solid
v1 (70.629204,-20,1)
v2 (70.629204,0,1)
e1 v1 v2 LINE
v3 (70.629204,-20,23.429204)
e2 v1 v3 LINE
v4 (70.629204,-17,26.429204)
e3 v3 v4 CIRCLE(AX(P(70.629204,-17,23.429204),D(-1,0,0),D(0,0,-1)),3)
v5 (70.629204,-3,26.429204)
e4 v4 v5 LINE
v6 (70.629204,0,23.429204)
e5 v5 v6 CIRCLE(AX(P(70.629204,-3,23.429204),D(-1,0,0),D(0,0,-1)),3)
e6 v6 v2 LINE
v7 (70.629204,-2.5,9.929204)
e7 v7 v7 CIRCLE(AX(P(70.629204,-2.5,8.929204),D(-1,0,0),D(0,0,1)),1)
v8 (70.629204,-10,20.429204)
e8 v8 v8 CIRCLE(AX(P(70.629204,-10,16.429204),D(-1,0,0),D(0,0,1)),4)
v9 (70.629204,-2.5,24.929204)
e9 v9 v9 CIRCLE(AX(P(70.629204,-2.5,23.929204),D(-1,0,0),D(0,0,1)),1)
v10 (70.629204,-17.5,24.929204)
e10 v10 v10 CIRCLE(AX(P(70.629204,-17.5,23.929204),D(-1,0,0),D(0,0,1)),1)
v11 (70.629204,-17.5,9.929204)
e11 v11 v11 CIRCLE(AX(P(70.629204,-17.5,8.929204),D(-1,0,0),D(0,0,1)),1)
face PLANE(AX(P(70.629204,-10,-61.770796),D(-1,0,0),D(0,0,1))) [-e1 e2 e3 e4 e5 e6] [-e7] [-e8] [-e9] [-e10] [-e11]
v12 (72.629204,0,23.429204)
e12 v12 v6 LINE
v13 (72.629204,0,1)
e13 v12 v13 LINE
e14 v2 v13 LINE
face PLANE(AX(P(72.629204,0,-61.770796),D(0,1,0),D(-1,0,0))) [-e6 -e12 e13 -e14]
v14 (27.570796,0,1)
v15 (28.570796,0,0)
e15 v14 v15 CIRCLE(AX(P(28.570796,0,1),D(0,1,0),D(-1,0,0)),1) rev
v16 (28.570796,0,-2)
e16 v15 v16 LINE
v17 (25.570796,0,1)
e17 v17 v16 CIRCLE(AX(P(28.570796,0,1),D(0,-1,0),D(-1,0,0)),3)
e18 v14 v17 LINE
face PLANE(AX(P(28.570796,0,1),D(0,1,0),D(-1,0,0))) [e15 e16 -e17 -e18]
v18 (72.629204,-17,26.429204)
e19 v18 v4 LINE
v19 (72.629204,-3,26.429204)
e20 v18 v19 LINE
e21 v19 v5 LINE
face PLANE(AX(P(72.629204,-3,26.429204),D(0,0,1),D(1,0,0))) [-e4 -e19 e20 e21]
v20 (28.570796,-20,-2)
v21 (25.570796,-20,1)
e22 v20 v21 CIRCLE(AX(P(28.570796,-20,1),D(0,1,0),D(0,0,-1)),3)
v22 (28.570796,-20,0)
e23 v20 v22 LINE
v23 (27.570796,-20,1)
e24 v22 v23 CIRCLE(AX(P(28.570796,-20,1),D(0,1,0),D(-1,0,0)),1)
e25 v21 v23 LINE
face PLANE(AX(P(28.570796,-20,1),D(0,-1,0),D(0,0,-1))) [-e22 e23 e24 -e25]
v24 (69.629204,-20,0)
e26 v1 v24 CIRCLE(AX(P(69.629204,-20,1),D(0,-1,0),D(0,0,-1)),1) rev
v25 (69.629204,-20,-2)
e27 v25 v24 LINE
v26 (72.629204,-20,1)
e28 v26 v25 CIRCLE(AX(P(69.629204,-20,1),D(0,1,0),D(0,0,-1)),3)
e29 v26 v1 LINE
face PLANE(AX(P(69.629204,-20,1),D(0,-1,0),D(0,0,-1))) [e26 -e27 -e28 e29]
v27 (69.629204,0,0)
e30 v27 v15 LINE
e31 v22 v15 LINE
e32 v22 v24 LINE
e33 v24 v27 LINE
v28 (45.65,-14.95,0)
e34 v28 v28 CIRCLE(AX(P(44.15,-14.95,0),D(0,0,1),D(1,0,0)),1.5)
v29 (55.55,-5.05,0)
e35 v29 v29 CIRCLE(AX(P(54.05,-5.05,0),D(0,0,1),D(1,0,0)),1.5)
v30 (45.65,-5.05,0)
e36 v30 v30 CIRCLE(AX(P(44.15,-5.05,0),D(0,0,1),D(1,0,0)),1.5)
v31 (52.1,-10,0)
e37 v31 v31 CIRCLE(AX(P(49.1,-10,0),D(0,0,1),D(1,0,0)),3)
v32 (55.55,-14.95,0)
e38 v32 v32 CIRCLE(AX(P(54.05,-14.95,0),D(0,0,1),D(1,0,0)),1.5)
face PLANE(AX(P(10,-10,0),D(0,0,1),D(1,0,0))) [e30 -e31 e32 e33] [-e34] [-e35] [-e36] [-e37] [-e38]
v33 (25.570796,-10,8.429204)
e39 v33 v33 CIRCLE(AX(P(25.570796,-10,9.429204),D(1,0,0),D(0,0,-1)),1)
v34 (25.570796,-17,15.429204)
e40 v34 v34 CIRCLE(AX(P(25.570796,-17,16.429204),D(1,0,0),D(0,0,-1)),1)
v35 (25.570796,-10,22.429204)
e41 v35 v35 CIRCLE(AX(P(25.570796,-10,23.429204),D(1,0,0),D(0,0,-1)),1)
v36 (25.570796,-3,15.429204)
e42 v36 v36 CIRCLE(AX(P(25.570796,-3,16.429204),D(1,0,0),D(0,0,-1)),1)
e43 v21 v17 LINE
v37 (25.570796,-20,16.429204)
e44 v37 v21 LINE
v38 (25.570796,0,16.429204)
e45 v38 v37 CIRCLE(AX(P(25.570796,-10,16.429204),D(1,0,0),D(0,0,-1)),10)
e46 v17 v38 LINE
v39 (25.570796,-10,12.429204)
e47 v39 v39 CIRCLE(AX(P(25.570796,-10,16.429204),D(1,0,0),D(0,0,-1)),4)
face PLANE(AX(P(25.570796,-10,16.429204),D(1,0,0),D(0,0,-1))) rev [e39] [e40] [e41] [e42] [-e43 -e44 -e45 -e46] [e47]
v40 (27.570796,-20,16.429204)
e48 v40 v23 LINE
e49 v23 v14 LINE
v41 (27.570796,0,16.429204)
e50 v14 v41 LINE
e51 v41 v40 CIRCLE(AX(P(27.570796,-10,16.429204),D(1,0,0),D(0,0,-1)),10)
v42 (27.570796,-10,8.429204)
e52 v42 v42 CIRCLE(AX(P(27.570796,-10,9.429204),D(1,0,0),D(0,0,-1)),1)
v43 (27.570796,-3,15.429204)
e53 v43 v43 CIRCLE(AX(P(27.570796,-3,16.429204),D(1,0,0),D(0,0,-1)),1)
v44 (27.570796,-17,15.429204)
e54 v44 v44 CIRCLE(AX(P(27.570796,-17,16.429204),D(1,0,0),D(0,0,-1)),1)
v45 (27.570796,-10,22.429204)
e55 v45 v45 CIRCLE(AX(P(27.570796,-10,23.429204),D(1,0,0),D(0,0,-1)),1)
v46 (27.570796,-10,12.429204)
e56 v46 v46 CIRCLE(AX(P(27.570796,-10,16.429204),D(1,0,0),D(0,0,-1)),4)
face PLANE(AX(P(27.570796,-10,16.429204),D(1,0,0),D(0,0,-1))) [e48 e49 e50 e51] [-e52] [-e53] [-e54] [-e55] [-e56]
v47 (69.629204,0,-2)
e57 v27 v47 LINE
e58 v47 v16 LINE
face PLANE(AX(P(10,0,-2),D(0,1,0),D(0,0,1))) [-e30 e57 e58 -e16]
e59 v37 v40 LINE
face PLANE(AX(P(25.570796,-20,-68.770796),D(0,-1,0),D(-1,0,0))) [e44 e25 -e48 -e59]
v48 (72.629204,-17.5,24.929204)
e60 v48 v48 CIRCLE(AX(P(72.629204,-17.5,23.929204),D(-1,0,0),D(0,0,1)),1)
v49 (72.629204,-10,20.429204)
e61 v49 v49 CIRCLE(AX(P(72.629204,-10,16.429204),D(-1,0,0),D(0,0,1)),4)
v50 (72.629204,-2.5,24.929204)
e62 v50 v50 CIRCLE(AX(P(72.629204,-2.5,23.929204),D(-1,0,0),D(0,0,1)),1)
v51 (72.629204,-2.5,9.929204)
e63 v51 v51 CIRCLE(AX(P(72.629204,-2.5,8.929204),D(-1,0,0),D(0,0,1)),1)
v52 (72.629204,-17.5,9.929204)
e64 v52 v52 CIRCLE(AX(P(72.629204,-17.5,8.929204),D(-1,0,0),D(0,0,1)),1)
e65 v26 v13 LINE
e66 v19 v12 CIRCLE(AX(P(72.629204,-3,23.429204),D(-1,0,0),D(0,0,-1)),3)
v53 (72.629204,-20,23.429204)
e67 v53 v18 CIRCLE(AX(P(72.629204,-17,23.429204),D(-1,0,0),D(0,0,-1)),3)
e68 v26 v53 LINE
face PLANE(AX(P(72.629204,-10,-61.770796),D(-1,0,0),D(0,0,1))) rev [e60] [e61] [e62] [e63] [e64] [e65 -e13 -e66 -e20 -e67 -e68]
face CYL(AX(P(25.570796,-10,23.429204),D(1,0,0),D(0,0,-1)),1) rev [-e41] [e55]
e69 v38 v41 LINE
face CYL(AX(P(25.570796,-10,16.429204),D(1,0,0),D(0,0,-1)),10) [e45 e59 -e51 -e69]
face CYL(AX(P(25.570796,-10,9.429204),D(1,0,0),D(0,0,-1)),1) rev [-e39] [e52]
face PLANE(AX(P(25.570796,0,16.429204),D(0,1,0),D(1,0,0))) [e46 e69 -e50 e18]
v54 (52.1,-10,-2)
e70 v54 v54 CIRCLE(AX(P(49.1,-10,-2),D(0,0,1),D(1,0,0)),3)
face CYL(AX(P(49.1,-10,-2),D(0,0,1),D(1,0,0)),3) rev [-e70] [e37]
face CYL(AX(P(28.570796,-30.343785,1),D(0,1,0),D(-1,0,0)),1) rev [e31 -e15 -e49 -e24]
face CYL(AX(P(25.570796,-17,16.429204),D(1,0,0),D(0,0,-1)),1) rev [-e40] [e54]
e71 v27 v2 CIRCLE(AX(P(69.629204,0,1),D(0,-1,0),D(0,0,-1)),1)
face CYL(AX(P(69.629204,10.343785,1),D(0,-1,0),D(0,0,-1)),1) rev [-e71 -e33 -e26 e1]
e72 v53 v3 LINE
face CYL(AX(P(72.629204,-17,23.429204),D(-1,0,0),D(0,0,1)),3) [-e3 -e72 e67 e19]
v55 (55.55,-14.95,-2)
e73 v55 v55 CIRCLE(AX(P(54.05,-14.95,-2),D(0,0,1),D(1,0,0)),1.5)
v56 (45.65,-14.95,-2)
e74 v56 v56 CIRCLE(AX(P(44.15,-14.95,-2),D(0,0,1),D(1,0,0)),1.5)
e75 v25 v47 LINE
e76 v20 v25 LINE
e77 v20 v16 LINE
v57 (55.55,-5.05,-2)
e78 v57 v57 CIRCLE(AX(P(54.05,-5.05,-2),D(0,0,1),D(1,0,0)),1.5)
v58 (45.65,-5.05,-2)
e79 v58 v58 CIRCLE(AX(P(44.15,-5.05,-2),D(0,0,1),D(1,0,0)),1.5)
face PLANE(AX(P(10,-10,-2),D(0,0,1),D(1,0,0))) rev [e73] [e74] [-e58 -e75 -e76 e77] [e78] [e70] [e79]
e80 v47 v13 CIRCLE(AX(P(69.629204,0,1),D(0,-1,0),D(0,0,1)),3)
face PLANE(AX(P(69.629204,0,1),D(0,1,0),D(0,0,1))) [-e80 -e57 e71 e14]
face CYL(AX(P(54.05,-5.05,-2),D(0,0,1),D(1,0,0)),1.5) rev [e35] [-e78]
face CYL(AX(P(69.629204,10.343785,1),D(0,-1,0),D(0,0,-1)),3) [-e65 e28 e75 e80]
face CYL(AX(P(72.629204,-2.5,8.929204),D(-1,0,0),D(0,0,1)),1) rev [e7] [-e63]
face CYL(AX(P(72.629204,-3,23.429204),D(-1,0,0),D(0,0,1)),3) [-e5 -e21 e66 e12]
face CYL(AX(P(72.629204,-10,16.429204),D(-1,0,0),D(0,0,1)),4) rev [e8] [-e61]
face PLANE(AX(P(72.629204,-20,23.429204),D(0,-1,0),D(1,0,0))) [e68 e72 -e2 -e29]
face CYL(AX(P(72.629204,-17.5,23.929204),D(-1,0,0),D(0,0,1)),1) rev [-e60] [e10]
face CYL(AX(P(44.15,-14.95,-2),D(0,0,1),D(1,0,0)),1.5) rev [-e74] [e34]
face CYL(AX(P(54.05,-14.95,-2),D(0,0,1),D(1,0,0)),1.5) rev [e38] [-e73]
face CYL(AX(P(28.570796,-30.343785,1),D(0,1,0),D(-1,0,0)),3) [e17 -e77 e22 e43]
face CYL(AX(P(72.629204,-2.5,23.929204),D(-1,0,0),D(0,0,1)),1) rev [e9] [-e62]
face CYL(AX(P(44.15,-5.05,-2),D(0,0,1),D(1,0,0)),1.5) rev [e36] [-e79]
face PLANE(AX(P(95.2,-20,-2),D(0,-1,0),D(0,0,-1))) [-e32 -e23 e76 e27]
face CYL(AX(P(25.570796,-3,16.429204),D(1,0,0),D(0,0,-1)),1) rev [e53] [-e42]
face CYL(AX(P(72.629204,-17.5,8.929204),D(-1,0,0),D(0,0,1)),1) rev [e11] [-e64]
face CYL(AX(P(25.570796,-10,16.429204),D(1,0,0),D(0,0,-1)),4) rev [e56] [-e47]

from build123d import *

# Parameters (mm, degrees)
IZIM1_R                      = 4
IZIM1_R_2                    = 1
IZIM1_R_3                    = 3
IZIM1_R_4                    = 1.5
TABAN_FLAN_2_DEPTH           = 2
IZGIDEN_START                = -1
IZGIDEN_B_KME2_OUTLINE_W     = 20
IZGIDEN_B_KME2_OUTLINE_H     = 2
IZGIDEN_B_KME2_DEPTH         = 26.570796327
IZGIDEN_START_2              = 72.629203673
IZGIDEN_B_KME2_2_OUTLINE_W   = 20
IZGIDEN_B_KME2_2_OUTLINE_H   = 2
IZGIDEN_B_KME2_2_DEPTH       = 25.570796327
IZGIDEN_START_3              = 25.570796327
IZGIDEN_B_KME2_3_OUTLINE_R   = 1
IZGIDEN_B_KME2_3_OUTLINE_R_2 = 4
IZGIDEN_B_KME2_3_DEPTH       = 3
IZGIDEN_START_4              = 69.629203673
IZGIDEN_B_KME2_4_OUTLINE_R   = 1
IZGIDEN_B_KME2_4_OUTLINE_R_2 = 4
IZGIDEN_B_KME2_4_DEPTH       = 3
IZGIDEN_START_5              = 70.629203673
IZGIDEN_B_KME2_5_OUTLINE_R   = 1
IZGIDEN_B_KME2_5_DEPTH       = 2
IZGIDEN_B_KME2_6_OUTLINE_R   = 1
IZGIDEN_B_KME2_6_DEPTH       = 2
IZGIDEN_START_6              = -21
IZGIDEN_B_KME2_7_DEPTH       = 22


with BuildPart() as part:
    # Taban-Flanş2: sheet metal written as solids
    # Çizim1 → Taban-Flanş2 (new body)
    with BuildSketch(Plane.XY):
        with BuildLine():
            Line((98.2, -3), (98.2, -17))
            ThreePointArc((98.2, -17), (97.321320344, -19.121320344), (95.2, -20))
            Line((95.2, -20), (10, -20))
            ThreePointArc((10, -20), (0, -10), (10, 0))
            Line((10, 0), (95.2, 0))
            ThreePointArc((95.2, 0), (97.321320344, -0.878679656), (98.2, -3))
        make_face()
        with Locations((10, -10)):
            Circle(IZIM1_R, mode=Mode.SUBTRACT)
        with Locations((10, -17)):
            Circle(IZIM1_R_2, mode=Mode.SUBTRACT)
        with Locations((3, -10)):
            Circle(IZIM1_R_2, mode=Mode.SUBTRACT)
        with Locations((10, -3)):
            Circle(IZIM1_R_2, mode=Mode.SUBTRACT)
        with Locations((17, -10)):
            Circle(IZIM1_R_2, mode=Mode.SUBTRACT)
        with Locations((88.2, -10)):
            Circle(IZIM1_R, mode=Mode.SUBTRACT)
        with Locations((80.7, -2.5)):
            Circle(IZIM1_R_2, mode=Mode.SUBTRACT)
        with Locations((95.7, -2.5)):
            Circle(IZIM1_R_2, mode=Mode.SUBTRACT)
        with Locations((95.7, -17.5)):
            Circle(IZIM1_R_2, mode=Mode.SUBTRACT)
        with Locations((80.7, -17.5)):
            Circle(IZIM1_R_2, mode=Mode.SUBTRACT)
        with Locations((49.1, -10)):
            Circle(IZIM1_R_3, mode=Mode.SUBTRACT)
        with Locations((54.05, -5.05)):
            Circle(IZIM1_R_4, mode=Mode.SUBTRACT)
        with Locations((44.15, -5.05)):
            Circle(IZIM1_R_4, mode=Mode.SUBTRACT)
        with Locations((44.15, -14.95)):
            Circle(IZIM1_R_4, mode=Mode.SUBTRACT)
        with Locations((54.05, -14.95)):
            Circle(IZIM1_R_4, mode=Mode.SUBTRACT)
    extrude(amount=-TABAN_FLAN_2_DEPTH)

    # Çizgiden Bükme2: read off the stored shape, not the designer's step
    # Çizgiden Bükme2 outline → Çizgiden Bükme2 (cut)
    with BuildSketch(Plane.YZ.offset(IZGIDEN_START)):
        with Locations((-10, -1)):
            Rectangle(IZGIDEN_B_KME2_OUTLINE_W, IZGIDEN_B_KME2_OUTLINE_H)
    extrude(amount=IZGIDEN_B_KME2_DEPTH, mode=Mode.SUBTRACT)

    # izgiden B_kme2 2 outline → izgiden B_kme2 2 (cut)
    with BuildSketch(Plane.YZ.offset(IZGIDEN_START_2)):
        with Locations((-10, -1)):
            Rectangle(IZGIDEN_B_KME2_2_OUTLINE_W, IZGIDEN_B_KME2_2_OUTLINE_H)
    extrude(amount=IZGIDEN_B_KME2_2_DEPTH, mode=Mode.SUBTRACT)

    # izgiden B_kme2 3 outline → izgiden B_kme2 3 (add)
    with BuildSketch(Plane.YZ.offset(IZGIDEN_START_3)):
        with BuildLine():
            Line((-20, 0), (0, 0))
            Line((0, 0), (0, 16.429203673))
            ThreePointArc((0, 16.429203673), (-0.620384974, 19.896597791), (-2.404564394, 22.933768067))
            ThreePointArc((-2.404564394, 22.933768067), (-3.207106781, 23.222096892), (-3.495435606, 24.024639279))
            ThreePointArc((-3.495435606, 24.024639279), (-10, 26.429203673), (-16.504564394, 24.024639279))
            ThreePointArc((-16.504564394, 24.024639279), (-16.792893219, 23.222096892), (-17.595435606, 22.933768067))
            ThreePointArc((-17.595435606, 22.933768067), (-19.379615026, 19.896597791), (-20, 16.429203673))
            Line((-20, 16.429203673), (-20, 0))
        make_face()
        with Locations((-17.5, 8.929203673)):
            Circle(IZGIDEN_B_KME2_3_OUTLINE_R, mode=Mode.SUBTRACT)
        with Locations((-10, 9.429203673)):
            Circle(IZGIDEN_B_KME2_3_OUTLINE_R, mode=Mode.SUBTRACT)
        with Locations((-2.5, 8.929203673)):
            Circle(IZGIDEN_B_KME2_3_OUTLINE_R, mode=Mode.SUBTRACT)
        with Locations((-17, 16.429203673)):
            Circle(IZGIDEN_B_KME2_3_OUTLINE_R, mode=Mode.SUBTRACT)
        with Locations((-10, 16.429203673)):
            Circle(IZGIDEN_B_KME2_3_OUTLINE_R_2, mode=Mode.SUBTRACT)
        with Locations((-3, 16.429203673)):
            Circle(IZGIDEN_B_KME2_3_OUTLINE_R, mode=Mode.SUBTRACT)
        with Locations((-10, 23.429203673)):
            Circle(IZGIDEN_B_KME2_3_OUTLINE_R, mode=Mode.SUBTRACT)
    extrude(amount=IZGIDEN_B_KME2_3_DEPTH)

    # izgiden B_kme2 4 outline → izgiden B_kme2 4 (add)
    with BuildSketch(Plane.YZ.offset(IZGIDEN_START_4)):
        with BuildLine():
            Line((-20, 0), (0, 0))
            Line((0, 0), (0, 16.429203673))
            ThreePointArc((0, 16.429203673), (-0.620384974, 19.896597791), (-2.404564394, 22.933768067))
            ThreePointArc((-2.404564394, 22.933768067), (-3.207106781, 23.222096892), (-3.495435606, 24.024639279))
            ThreePointArc((-3.495435606, 24.024639279), (-10, 26.429203673), (-16.504564394, 24.024639279))
            ThreePointArc((-16.504564394, 24.024639279), (-16.792893219, 23.222096892), (-17.595435606, 22.933768067))
            ThreePointArc((-17.595435606, 22.933768067), (-19.379615026, 19.896597791), (-20, 16.429203673))
            Line((-20, 16.429203673), (-20, 0))
        make_face()
        with Locations((-17.5, 8.929203673)):
            Circle(IZGIDEN_B_KME2_4_OUTLINE_R, mode=Mode.SUBTRACT)
        with Locations((-10, 9.429203673)):
            Circle(IZGIDEN_B_KME2_4_OUTLINE_R, mode=Mode.SUBTRACT)
        with Locations((-2.5, 8.929203673)):
            Circle(IZGIDEN_B_KME2_4_OUTLINE_R, mode=Mode.SUBTRACT)
        with Locations((-17, 16.429203673)):
            Circle(IZGIDEN_B_KME2_4_OUTLINE_R, mode=Mode.SUBTRACT)
        with Locations((-10, 16.429203673)):
            Circle(IZGIDEN_B_KME2_4_OUTLINE_R_2, mode=Mode.SUBTRACT)
        with Locations((-3, 16.429203673)):
            Circle(IZGIDEN_B_KME2_4_OUTLINE_R, mode=Mode.SUBTRACT)
        with Locations((-10, 23.429203673)):
            Circle(IZGIDEN_B_KME2_4_OUTLINE_R, mode=Mode.SUBTRACT)
    extrude(amount=IZGIDEN_B_KME2_4_DEPTH)

    # izgiden B_kme2 5 outline → izgiden B_kme2 5 (add)
    with BuildSketch(Plane.YZ.offset(IZGIDEN_START_5)):
        with BuildLine():
            ThreePointArc((-2.404564394, 22.933768067), (-0.620384974, 19.896597791), (0, 16.429203673))
            Line((0, 16.429203673), (0, 23.429203673))
            ThreePointArc((0, 23.429203673), (-0.878679656, 25.550524017), (-3, 26.429203673))
            Line((-3, 26.429203673), (-10, 26.429203673))
            ThreePointArc((-10, 26.429203673), (-6.532605882, 25.808818699), (-3.495435606, 24.024639279))
            ThreePointArc((-3.495435606, 24.024639279), (-1.792893219, 24.636310454), (-2.404564394, 22.933768067))
        make_face()
        with BuildLine():
            Line((-20, 23.429203673), (-20, 16.429203673))
            ThreePointArc((-20, 16.429203673), (-19.379615026, 19.896597791), (-17.595435606, 22.933768067))
            ThreePointArc((-17.595435606, 22.933768067), (-18.207106781, 24.636310454), (-16.504564394, 24.024639279))
            ThreePointArc((-16.504564394, 24.024639279), (-13.467394118, 25.808818699), (-10, 26.429203673))
            Line((-10, 26.429203673), (-17, 26.429203673))
            ThreePointArc((-17, 26.429203673), (-19.121320344, 25.550524017), (-20, 23.429203673))
        make_face()
        with Locations((-17, 16.429203673)):
            Circle(IZGIDEN_B_KME2_5_OUTLINE_R)
        with Locations((-10, 23.429203673)):
            Circle(IZGIDEN_B_KME2_5_OUTLINE_R)
        with Locations((-3, 16.429203673)):
            Circle(IZGIDEN_B_KME2_5_OUTLINE_R)
        with Locations((-10, 9.429203673)):
            Circle(IZGIDEN_B_KME2_5_OUTLINE_R)
    extrude(amount=IZGIDEN_B_KME2_5_DEPTH)

    # izgiden B_kme2 6 outline → izgiden B_kme2 6 (add)
    with BuildSketch(Plane.YZ.offset(IZGIDEN_START_3)):
        with BuildLine():
            ThreePointArc((-3.495435606, 24.024639279), (-3.207106781, 23.222096892), (-2.404564394, 22.933768067))
            ThreePointArc((-2.404564394, 22.933768067), (-2.928932188, 23.500271485), (-3.495435606, 24.024639279))
        make_face()
        with BuildLine():
            ThreePointArc((-16.504564394, 24.024639279), (-17.071067812, 23.500271485), (-17.595435606, 22.933768067))
            ThreePointArc((-17.595435606, 22.933768067), (-16.792893219, 23.222096892), (-16.504564394, 24.024639279))
        make_face()
        with Locations((-2.5, 8.929203673)):
            Circle(IZGIDEN_B_KME2_6_OUTLINE_R)
        with Locations((-17.5, 8.929203673)):
            Circle(IZGIDEN_B_KME2_6_OUTLINE_R)
    extrude(amount=IZGIDEN_B_KME2_6_DEPTH)

    # izgiden B_kme2 7 outline → izgiden B_kme2 7 (cut)
    with BuildSketch(Plane(origin=(0, 0, 0), x_dir=(1, 0, 0), z_dir=(0, 1, 0)).offset(IZGIDEN_START_6)):
        with BuildLine():
            ThreePointArc((25.570796327, -1), (26.449475983, 1.121320344), (28.570796327, 2))
            Line((28.570796327, 2), (25.570796327, 1.999999978))
            Line((25.570796327, 1.999999978), (25.570796327, -1))
        make_face()
        with BuildLine():
            Line((72.629203673, 1.999999978), (69.629203673, 2))
            ThreePointArc((69.629203673, 2), (71.750524017, 1.121320344), (72.629203673, -1))
            Line((72.629203673, -1), (72.629203673, 1.999999978))
        make_face()
        with BuildLine():
            Line((27.570796327, -1), (27.570796327, -28))
            Line((27.570796327, -28), (28.570796327, -28))
            Line((28.570796327, -28), (28.570796327, 0))
            ThreePointArc((28.570796327, 0), (27.863689546, -0.292893219), (27.570796327, -1))
        make_face()
        with BuildLine():
            Line((69.629203673, -28), (70.629203673, -28))
            Line((70.629203673, -28), (70.629203673, -1))
            ThreePointArc((70.629203673, -1), (70.336310454, -0.292893219), (69.629203673, 0))
            Line((69.629203673, 0), (69.629203673, -28))
        make_face()
    extrude(amount=IZGIDEN_B_KME2_7_DEPTH, mode=Mode.SUBTRACT)


solid = part.part
